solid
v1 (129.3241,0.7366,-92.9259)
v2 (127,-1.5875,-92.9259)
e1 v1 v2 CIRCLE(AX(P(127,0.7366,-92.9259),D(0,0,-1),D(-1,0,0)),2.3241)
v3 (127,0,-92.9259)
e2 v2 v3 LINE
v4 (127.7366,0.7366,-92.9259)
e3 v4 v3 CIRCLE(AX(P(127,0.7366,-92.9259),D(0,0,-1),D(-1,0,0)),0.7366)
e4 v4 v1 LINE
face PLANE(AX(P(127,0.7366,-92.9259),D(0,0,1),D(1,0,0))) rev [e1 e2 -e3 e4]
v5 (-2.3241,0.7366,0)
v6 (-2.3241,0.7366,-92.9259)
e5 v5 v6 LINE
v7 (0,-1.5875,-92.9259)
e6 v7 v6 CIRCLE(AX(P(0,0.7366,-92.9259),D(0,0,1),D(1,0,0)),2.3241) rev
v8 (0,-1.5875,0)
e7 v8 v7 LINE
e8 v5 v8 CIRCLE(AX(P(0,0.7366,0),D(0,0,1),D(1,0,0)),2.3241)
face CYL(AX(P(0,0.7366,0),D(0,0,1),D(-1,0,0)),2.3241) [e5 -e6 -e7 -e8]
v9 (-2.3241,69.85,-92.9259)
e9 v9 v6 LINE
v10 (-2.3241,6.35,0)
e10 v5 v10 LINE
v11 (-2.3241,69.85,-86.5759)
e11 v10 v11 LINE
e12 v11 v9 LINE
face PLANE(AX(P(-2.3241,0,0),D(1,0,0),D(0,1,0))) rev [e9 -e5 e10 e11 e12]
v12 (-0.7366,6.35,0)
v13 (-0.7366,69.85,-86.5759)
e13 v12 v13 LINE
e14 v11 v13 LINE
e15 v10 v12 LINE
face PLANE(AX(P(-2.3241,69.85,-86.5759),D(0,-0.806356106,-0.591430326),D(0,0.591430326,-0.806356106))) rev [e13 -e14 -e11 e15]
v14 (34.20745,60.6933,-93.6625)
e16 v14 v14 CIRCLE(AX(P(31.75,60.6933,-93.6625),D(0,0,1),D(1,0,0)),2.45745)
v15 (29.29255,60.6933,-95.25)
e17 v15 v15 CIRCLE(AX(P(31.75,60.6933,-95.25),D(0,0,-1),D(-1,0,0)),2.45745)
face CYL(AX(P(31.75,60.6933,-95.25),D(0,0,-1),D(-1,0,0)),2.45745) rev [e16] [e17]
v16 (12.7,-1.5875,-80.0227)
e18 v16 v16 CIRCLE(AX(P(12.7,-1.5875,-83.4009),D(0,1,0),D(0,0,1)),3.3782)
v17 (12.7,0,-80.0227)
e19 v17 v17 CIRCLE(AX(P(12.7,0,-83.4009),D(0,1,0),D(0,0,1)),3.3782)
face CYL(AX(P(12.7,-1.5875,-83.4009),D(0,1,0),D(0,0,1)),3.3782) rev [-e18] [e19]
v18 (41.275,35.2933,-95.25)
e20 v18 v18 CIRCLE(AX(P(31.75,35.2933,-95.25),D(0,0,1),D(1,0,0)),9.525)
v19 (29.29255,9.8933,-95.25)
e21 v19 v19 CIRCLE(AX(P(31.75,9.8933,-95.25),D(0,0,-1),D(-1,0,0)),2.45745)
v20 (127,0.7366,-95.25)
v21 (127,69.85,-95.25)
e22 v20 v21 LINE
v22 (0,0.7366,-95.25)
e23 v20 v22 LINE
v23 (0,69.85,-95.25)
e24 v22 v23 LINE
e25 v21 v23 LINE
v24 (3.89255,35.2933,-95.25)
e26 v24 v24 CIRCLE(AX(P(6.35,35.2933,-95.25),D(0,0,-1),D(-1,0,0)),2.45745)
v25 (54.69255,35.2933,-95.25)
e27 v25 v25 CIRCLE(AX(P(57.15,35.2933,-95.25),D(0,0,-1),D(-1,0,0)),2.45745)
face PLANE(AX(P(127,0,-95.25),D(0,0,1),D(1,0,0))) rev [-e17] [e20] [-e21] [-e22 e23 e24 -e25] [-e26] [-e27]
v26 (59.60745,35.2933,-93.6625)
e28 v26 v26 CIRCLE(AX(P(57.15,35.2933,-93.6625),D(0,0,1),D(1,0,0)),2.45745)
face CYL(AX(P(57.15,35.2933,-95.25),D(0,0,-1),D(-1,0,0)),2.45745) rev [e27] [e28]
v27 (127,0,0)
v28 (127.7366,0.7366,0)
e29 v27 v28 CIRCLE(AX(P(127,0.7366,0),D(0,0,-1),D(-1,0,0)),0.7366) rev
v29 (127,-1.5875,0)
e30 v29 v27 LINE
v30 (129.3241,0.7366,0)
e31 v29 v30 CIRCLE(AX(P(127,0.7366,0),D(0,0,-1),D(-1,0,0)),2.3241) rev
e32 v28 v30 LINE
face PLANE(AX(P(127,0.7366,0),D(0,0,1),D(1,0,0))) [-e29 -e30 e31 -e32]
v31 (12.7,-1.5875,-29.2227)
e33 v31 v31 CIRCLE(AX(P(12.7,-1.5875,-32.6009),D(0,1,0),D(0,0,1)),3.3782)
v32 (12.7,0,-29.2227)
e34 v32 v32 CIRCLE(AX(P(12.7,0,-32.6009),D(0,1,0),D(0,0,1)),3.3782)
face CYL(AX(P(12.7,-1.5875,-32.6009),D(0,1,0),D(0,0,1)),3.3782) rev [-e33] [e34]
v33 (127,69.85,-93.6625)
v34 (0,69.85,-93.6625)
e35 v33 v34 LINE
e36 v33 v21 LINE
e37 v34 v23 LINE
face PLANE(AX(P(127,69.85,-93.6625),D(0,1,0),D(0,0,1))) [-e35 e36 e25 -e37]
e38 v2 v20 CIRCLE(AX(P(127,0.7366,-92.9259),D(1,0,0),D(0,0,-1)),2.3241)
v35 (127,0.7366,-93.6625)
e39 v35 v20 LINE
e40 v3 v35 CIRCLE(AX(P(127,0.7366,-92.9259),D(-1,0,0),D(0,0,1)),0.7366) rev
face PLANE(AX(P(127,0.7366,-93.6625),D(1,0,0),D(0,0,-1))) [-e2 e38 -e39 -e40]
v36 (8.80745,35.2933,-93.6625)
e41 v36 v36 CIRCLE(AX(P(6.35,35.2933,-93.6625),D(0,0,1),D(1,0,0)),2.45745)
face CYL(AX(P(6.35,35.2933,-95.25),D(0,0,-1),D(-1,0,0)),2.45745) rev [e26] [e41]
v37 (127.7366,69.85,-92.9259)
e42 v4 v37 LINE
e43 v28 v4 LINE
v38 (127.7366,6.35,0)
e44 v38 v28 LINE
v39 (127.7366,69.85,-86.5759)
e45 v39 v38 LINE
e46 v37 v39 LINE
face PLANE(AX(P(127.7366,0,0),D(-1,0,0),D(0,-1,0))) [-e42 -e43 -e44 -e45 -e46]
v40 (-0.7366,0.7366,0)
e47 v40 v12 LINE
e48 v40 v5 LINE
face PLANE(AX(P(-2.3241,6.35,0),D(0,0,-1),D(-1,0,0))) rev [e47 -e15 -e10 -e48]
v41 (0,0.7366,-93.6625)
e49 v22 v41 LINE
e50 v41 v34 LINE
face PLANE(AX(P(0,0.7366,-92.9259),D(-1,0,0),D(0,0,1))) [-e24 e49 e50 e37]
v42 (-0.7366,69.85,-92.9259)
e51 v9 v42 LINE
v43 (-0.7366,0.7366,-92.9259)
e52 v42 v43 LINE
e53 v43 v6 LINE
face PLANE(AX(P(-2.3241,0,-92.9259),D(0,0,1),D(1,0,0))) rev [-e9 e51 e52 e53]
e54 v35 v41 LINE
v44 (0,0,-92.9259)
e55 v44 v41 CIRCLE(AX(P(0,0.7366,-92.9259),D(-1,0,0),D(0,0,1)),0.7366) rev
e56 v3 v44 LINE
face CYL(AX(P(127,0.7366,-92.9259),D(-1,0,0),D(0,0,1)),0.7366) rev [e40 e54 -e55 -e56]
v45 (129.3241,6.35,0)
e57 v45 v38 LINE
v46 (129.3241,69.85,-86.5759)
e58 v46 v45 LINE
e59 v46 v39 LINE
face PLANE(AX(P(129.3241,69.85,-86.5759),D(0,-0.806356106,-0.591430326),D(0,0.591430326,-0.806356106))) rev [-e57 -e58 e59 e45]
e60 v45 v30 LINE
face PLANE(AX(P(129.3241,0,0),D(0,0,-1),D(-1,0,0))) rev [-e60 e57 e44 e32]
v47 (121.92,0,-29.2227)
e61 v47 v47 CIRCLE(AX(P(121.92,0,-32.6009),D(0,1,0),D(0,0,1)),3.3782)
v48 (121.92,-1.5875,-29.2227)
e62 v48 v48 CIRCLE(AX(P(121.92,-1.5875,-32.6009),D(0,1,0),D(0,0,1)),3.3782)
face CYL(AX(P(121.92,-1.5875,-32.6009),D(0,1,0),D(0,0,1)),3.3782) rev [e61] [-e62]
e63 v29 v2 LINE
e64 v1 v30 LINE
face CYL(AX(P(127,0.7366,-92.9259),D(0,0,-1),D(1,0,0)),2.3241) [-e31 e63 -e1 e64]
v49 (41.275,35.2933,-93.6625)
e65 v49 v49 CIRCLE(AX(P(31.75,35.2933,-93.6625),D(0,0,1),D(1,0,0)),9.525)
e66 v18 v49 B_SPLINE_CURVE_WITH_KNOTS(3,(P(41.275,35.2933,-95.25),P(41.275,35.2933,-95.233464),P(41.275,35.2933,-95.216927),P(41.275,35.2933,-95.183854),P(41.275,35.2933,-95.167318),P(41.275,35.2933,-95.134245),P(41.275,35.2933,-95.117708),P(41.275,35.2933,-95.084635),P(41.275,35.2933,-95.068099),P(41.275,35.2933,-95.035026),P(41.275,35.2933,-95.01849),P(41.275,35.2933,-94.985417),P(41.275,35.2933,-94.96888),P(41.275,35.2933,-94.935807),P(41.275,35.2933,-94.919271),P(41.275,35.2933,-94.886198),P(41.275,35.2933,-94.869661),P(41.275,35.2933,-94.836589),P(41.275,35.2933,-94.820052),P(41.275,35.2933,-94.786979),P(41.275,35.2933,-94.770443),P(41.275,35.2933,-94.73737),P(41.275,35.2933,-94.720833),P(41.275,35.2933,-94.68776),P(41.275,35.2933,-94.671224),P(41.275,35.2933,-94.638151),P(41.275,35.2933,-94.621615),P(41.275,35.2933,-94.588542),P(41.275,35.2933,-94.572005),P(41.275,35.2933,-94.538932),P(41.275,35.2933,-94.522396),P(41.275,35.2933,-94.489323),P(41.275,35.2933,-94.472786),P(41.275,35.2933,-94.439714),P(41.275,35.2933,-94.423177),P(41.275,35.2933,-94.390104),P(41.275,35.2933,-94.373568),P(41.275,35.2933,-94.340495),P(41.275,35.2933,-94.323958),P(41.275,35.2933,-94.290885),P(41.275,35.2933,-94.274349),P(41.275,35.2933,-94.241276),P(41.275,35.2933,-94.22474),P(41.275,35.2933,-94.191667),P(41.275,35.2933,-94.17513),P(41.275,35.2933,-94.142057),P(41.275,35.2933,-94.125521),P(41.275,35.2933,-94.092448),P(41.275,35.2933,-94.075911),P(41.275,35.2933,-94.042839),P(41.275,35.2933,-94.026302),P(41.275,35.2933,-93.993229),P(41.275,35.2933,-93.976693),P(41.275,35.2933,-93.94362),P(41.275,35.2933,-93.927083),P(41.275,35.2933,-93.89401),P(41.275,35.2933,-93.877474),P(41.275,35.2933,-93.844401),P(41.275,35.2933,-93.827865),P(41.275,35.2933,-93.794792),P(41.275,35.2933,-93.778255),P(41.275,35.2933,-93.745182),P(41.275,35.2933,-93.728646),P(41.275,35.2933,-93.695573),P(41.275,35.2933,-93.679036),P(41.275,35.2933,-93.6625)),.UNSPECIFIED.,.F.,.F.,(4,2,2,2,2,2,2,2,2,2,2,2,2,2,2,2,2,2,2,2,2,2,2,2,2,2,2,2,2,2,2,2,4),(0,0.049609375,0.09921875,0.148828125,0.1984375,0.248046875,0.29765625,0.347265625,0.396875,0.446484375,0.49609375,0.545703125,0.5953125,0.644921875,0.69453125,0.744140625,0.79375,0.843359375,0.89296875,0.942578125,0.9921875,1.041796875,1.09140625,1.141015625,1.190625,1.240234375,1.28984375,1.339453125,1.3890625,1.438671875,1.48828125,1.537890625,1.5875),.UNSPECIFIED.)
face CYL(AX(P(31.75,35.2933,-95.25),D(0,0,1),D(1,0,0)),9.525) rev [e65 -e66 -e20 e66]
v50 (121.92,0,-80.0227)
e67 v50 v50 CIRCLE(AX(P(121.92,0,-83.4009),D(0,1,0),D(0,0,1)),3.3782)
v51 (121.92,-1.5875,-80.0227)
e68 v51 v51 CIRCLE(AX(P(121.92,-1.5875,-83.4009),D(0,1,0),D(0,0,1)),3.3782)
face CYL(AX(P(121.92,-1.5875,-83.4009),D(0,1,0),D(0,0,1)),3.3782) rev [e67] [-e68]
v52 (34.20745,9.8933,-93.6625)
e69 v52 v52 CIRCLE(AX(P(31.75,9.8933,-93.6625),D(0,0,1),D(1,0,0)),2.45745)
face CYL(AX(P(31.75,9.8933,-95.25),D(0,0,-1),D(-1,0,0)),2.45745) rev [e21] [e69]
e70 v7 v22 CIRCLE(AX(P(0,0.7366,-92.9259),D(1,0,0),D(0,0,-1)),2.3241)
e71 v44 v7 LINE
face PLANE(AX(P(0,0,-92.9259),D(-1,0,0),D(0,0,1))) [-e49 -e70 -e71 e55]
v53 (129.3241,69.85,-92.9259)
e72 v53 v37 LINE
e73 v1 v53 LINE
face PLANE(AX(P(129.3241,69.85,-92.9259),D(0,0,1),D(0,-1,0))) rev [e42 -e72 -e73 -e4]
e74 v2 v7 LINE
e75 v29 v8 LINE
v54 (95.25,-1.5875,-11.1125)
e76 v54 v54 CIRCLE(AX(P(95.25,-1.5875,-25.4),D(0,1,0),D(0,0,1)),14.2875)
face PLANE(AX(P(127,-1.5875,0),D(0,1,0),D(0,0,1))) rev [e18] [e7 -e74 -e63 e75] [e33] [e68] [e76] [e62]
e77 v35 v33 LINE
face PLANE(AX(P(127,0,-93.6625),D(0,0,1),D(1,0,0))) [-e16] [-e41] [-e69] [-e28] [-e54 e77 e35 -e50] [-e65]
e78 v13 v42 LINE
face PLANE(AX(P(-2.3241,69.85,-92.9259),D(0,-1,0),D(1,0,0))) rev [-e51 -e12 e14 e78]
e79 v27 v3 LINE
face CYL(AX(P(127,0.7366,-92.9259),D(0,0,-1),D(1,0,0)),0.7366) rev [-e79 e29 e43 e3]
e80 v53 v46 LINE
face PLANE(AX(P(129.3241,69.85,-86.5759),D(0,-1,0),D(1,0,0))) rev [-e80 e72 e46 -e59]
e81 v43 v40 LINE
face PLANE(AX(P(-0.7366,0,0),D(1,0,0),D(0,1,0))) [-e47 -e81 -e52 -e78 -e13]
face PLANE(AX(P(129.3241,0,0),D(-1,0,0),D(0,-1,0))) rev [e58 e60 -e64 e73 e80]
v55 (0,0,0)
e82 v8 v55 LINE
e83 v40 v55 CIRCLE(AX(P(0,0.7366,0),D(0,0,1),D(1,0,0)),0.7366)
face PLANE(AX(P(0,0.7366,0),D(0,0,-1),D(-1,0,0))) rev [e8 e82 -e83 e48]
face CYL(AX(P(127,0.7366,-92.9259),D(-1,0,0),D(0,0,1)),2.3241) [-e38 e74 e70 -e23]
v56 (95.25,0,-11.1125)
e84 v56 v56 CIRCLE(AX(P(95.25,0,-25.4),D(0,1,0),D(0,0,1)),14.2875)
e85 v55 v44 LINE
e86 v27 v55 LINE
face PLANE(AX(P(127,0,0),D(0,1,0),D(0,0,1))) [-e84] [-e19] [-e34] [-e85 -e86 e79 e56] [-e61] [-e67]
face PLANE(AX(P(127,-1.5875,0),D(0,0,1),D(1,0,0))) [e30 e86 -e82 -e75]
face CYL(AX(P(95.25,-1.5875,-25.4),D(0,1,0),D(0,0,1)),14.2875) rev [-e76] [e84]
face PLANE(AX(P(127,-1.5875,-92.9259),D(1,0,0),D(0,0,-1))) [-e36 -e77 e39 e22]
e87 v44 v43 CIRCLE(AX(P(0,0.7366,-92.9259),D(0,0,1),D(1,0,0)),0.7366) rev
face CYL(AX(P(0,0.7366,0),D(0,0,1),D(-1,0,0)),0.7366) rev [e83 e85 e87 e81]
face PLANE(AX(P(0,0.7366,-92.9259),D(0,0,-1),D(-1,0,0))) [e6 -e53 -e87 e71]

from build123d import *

# Parameters (mm, degrees)
BASE_FLANGE1_DEPTH           = 127
EDGE_FLANGE1_DEPTH           = 92.9259
EDGE_FLANGE1_START           = 1.5875
EDGE_FLANGE1_FLAT_DEPTH      = 1.5875
EDGE_FLANGE1_BEND_DEPTH      = 92.9259
EDGE_FLANGE1_FLAT_2_DEPTH    = 1.5875
SKETCH15_R                   = 14.2875
CUT_EXTRUDE1_DEPTH           = 176.146532483
SKETCH16_R                   = 3.3782
CUT_EXTRUDE2_DEPTH           = 176.146532483
SKETCH17_R                   = 9.525
CUT_EXTRUDE3_DEPTH           = 175.288293488
F_10_0_1935_DIAMETER_HOLE1_D = 4.9149


# Sheet-metal steps are written as plain solids
with BuildPart() as part:
    # Sketch1 → Base-Flange1 (new body)
    with BuildSketch(Plane(origin=(0, 0, 0), x_dir=(0, 0, -1), z_dir=(1, 0, 0))):
        with BuildLine():
            Line((0, 0), (92.9259, 0))
            ThreePointArc((92.9259, 0), (93.446754855, 0.215745145), (93.6625, 0.7366))
            Line((93.6625, 0.7366), (93.6625, 69.85))
            Line((93.6625, 69.85), (95.25, 69.85))
            Line((95.25, 69.85), (95.25, 0.7366))
            ThreePointArc((95.25, 0.7366), (94.56928687, -0.90678687), (92.9259, -1.5875))
            Line((92.9259, -1.5875), (0, -1.5875))
            Line((0, -1.5875), (0, 0))
        make_face()
    extrude(amount=BASE_FLANGE1_DEPTH)

    # Edge-Flange1 bend section (across the edge) → Edge-Flange1 (add)
    with BuildSketch(Plane(origin=(-0.7366, 0, -92.9259), x_dir=(1, 0, 0), z_dir=(0, 0, 1))):
        with BuildLine():
            Line((-1.5875, 0.7366), (0, 0.7366))
            ThreePointArc((0, 0.7366), (0.215745145, 0.215745145), (0.7366, 0))
            Line((0.7366, 0), (0.7366, -1.5875))
            ThreePointArc((0.7366, -1.5875), (-0.90678687, -0.90678687), (-1.5875, 0.7366))
        make_face()
    extrude(amount=EDGE_FLANGE1_DEPTH)

    # Edge-Flange1 profile (on flange) → Edge-Flange1 flat (add)
    with BuildSketch(Plane.ZY.offset(0.7366).offset(EDGE_FLANGE1_START)):
        Polygon((0, 0.7366), (0, 6.35), (-86.5759, 69.85), (-92.9259, 69.85), (-92.9259, 0.7366), align=None)
    extrude(amount=-EDGE_FLANGE1_FLAT_DEPTH)

    # Edge-Flange1 bend section 2 (across the edge) → Edge-Flange1 bend (add)
    with BuildSketch(Plane(origin=(127.7366, 0, 0), x_dir=(-1, 0, 0), z_dir=(0, 0, -1))):
        with BuildLine():
            Line((-1.5875, 0.7366), (0, 0.7366))
            ThreePointArc((0, 0.7366), (0.215745145, 0.215745145), (0.7366, 0))
            Line((0.7366, 0), (0.7366, -1.5875))
            ThreePointArc((0.7366, -1.5875), (-0.90678687, -0.90678687), (-1.5875, 0.7366))
        make_face()
    extrude(amount=EDGE_FLANGE1_BEND_DEPTH)

    # Edge-Flange1 profile 2 (on flange) → Edge-Flange1 flat 2 (add)
    with BuildSketch(Plane(origin=(127.7366, 0, 0), x_dir=(0, 0, -1), z_dir=(1, 0, 0)).offset(EDGE_FLANGE1_START)):
        Polygon((0, 6.35), (0, 0.7366), (92.9259, 0.7366), (92.9259, 69.85), (86.5759, 69.85), align=None)
    extrude(amount=-EDGE_FLANGE1_FLAT_2_DEPTH)

    # Sketch15 → Cut-Extrude1 (cut, through all)
    with BuildSketch(Plane(origin=(0, 0, 0), x_dir=(1, 0, 0), z_dir=(0, 1, 0))):
        with Locations(Location((95.25, 25.4, 0), (0, 0, 270))):
            Circle(SKETCH15_R)
    extrude(amount=-CUT_EXTRUDE1_DEPTH, mode=Mode.SUBTRACT)

    # Sketch16 → Cut-Extrude2 (cut, through all)
    with BuildSketch(Plane(origin=(0, 0, 0), x_dir=(1, 0, 0), z_dir=(0, 1, 0))):
        with Locations(Location((12.7, 83.4009, 0), (0, 0, 270))):
            Circle(SKETCH16_R)
        with Locations(Location((121.92, 83.4009, 0), (0, 0, 270))):
            Circle(SKETCH16_R)
        with Locations(Location((121.92, 32.6009, 0), (0, 0, 270))):
            Circle(SKETCH16_R)
        with Locations(Location((12.7, 32.6009, 0), (0, 0, 270))):
            Circle(SKETCH16_R)
    extrude(amount=-CUT_EXTRUDE2_DEPTH, mode=Mode.SUBTRACT)

    # Sketch17 → Cut-Extrude3 (cut, through all)
    with BuildSketch(Plane.XY.offset(-93.6625)):
        with Locations((31.75, 35.2933)):
            Circle(SKETCH17_R)
    extrude(amount=-CUT_EXTRUDE3_DEPTH, mode=Mode.SUBTRACT)

    # #10 (0.1935) Diameter Hole1 (through all)
    with Locations(Plane(origin=(0, 0, -95.25), x_dir=(-1, 0, 0), z_dir=(0, 0, -1))):
        with Locations((-31.75, 60.6933), (-6.35, 35.2933), (-31.75, 9.8933), (-57.15, 35.2933)):
            Hole(F_10_0_1935_DIAMETER_HOLE1_D / 2)


solid = part.part
